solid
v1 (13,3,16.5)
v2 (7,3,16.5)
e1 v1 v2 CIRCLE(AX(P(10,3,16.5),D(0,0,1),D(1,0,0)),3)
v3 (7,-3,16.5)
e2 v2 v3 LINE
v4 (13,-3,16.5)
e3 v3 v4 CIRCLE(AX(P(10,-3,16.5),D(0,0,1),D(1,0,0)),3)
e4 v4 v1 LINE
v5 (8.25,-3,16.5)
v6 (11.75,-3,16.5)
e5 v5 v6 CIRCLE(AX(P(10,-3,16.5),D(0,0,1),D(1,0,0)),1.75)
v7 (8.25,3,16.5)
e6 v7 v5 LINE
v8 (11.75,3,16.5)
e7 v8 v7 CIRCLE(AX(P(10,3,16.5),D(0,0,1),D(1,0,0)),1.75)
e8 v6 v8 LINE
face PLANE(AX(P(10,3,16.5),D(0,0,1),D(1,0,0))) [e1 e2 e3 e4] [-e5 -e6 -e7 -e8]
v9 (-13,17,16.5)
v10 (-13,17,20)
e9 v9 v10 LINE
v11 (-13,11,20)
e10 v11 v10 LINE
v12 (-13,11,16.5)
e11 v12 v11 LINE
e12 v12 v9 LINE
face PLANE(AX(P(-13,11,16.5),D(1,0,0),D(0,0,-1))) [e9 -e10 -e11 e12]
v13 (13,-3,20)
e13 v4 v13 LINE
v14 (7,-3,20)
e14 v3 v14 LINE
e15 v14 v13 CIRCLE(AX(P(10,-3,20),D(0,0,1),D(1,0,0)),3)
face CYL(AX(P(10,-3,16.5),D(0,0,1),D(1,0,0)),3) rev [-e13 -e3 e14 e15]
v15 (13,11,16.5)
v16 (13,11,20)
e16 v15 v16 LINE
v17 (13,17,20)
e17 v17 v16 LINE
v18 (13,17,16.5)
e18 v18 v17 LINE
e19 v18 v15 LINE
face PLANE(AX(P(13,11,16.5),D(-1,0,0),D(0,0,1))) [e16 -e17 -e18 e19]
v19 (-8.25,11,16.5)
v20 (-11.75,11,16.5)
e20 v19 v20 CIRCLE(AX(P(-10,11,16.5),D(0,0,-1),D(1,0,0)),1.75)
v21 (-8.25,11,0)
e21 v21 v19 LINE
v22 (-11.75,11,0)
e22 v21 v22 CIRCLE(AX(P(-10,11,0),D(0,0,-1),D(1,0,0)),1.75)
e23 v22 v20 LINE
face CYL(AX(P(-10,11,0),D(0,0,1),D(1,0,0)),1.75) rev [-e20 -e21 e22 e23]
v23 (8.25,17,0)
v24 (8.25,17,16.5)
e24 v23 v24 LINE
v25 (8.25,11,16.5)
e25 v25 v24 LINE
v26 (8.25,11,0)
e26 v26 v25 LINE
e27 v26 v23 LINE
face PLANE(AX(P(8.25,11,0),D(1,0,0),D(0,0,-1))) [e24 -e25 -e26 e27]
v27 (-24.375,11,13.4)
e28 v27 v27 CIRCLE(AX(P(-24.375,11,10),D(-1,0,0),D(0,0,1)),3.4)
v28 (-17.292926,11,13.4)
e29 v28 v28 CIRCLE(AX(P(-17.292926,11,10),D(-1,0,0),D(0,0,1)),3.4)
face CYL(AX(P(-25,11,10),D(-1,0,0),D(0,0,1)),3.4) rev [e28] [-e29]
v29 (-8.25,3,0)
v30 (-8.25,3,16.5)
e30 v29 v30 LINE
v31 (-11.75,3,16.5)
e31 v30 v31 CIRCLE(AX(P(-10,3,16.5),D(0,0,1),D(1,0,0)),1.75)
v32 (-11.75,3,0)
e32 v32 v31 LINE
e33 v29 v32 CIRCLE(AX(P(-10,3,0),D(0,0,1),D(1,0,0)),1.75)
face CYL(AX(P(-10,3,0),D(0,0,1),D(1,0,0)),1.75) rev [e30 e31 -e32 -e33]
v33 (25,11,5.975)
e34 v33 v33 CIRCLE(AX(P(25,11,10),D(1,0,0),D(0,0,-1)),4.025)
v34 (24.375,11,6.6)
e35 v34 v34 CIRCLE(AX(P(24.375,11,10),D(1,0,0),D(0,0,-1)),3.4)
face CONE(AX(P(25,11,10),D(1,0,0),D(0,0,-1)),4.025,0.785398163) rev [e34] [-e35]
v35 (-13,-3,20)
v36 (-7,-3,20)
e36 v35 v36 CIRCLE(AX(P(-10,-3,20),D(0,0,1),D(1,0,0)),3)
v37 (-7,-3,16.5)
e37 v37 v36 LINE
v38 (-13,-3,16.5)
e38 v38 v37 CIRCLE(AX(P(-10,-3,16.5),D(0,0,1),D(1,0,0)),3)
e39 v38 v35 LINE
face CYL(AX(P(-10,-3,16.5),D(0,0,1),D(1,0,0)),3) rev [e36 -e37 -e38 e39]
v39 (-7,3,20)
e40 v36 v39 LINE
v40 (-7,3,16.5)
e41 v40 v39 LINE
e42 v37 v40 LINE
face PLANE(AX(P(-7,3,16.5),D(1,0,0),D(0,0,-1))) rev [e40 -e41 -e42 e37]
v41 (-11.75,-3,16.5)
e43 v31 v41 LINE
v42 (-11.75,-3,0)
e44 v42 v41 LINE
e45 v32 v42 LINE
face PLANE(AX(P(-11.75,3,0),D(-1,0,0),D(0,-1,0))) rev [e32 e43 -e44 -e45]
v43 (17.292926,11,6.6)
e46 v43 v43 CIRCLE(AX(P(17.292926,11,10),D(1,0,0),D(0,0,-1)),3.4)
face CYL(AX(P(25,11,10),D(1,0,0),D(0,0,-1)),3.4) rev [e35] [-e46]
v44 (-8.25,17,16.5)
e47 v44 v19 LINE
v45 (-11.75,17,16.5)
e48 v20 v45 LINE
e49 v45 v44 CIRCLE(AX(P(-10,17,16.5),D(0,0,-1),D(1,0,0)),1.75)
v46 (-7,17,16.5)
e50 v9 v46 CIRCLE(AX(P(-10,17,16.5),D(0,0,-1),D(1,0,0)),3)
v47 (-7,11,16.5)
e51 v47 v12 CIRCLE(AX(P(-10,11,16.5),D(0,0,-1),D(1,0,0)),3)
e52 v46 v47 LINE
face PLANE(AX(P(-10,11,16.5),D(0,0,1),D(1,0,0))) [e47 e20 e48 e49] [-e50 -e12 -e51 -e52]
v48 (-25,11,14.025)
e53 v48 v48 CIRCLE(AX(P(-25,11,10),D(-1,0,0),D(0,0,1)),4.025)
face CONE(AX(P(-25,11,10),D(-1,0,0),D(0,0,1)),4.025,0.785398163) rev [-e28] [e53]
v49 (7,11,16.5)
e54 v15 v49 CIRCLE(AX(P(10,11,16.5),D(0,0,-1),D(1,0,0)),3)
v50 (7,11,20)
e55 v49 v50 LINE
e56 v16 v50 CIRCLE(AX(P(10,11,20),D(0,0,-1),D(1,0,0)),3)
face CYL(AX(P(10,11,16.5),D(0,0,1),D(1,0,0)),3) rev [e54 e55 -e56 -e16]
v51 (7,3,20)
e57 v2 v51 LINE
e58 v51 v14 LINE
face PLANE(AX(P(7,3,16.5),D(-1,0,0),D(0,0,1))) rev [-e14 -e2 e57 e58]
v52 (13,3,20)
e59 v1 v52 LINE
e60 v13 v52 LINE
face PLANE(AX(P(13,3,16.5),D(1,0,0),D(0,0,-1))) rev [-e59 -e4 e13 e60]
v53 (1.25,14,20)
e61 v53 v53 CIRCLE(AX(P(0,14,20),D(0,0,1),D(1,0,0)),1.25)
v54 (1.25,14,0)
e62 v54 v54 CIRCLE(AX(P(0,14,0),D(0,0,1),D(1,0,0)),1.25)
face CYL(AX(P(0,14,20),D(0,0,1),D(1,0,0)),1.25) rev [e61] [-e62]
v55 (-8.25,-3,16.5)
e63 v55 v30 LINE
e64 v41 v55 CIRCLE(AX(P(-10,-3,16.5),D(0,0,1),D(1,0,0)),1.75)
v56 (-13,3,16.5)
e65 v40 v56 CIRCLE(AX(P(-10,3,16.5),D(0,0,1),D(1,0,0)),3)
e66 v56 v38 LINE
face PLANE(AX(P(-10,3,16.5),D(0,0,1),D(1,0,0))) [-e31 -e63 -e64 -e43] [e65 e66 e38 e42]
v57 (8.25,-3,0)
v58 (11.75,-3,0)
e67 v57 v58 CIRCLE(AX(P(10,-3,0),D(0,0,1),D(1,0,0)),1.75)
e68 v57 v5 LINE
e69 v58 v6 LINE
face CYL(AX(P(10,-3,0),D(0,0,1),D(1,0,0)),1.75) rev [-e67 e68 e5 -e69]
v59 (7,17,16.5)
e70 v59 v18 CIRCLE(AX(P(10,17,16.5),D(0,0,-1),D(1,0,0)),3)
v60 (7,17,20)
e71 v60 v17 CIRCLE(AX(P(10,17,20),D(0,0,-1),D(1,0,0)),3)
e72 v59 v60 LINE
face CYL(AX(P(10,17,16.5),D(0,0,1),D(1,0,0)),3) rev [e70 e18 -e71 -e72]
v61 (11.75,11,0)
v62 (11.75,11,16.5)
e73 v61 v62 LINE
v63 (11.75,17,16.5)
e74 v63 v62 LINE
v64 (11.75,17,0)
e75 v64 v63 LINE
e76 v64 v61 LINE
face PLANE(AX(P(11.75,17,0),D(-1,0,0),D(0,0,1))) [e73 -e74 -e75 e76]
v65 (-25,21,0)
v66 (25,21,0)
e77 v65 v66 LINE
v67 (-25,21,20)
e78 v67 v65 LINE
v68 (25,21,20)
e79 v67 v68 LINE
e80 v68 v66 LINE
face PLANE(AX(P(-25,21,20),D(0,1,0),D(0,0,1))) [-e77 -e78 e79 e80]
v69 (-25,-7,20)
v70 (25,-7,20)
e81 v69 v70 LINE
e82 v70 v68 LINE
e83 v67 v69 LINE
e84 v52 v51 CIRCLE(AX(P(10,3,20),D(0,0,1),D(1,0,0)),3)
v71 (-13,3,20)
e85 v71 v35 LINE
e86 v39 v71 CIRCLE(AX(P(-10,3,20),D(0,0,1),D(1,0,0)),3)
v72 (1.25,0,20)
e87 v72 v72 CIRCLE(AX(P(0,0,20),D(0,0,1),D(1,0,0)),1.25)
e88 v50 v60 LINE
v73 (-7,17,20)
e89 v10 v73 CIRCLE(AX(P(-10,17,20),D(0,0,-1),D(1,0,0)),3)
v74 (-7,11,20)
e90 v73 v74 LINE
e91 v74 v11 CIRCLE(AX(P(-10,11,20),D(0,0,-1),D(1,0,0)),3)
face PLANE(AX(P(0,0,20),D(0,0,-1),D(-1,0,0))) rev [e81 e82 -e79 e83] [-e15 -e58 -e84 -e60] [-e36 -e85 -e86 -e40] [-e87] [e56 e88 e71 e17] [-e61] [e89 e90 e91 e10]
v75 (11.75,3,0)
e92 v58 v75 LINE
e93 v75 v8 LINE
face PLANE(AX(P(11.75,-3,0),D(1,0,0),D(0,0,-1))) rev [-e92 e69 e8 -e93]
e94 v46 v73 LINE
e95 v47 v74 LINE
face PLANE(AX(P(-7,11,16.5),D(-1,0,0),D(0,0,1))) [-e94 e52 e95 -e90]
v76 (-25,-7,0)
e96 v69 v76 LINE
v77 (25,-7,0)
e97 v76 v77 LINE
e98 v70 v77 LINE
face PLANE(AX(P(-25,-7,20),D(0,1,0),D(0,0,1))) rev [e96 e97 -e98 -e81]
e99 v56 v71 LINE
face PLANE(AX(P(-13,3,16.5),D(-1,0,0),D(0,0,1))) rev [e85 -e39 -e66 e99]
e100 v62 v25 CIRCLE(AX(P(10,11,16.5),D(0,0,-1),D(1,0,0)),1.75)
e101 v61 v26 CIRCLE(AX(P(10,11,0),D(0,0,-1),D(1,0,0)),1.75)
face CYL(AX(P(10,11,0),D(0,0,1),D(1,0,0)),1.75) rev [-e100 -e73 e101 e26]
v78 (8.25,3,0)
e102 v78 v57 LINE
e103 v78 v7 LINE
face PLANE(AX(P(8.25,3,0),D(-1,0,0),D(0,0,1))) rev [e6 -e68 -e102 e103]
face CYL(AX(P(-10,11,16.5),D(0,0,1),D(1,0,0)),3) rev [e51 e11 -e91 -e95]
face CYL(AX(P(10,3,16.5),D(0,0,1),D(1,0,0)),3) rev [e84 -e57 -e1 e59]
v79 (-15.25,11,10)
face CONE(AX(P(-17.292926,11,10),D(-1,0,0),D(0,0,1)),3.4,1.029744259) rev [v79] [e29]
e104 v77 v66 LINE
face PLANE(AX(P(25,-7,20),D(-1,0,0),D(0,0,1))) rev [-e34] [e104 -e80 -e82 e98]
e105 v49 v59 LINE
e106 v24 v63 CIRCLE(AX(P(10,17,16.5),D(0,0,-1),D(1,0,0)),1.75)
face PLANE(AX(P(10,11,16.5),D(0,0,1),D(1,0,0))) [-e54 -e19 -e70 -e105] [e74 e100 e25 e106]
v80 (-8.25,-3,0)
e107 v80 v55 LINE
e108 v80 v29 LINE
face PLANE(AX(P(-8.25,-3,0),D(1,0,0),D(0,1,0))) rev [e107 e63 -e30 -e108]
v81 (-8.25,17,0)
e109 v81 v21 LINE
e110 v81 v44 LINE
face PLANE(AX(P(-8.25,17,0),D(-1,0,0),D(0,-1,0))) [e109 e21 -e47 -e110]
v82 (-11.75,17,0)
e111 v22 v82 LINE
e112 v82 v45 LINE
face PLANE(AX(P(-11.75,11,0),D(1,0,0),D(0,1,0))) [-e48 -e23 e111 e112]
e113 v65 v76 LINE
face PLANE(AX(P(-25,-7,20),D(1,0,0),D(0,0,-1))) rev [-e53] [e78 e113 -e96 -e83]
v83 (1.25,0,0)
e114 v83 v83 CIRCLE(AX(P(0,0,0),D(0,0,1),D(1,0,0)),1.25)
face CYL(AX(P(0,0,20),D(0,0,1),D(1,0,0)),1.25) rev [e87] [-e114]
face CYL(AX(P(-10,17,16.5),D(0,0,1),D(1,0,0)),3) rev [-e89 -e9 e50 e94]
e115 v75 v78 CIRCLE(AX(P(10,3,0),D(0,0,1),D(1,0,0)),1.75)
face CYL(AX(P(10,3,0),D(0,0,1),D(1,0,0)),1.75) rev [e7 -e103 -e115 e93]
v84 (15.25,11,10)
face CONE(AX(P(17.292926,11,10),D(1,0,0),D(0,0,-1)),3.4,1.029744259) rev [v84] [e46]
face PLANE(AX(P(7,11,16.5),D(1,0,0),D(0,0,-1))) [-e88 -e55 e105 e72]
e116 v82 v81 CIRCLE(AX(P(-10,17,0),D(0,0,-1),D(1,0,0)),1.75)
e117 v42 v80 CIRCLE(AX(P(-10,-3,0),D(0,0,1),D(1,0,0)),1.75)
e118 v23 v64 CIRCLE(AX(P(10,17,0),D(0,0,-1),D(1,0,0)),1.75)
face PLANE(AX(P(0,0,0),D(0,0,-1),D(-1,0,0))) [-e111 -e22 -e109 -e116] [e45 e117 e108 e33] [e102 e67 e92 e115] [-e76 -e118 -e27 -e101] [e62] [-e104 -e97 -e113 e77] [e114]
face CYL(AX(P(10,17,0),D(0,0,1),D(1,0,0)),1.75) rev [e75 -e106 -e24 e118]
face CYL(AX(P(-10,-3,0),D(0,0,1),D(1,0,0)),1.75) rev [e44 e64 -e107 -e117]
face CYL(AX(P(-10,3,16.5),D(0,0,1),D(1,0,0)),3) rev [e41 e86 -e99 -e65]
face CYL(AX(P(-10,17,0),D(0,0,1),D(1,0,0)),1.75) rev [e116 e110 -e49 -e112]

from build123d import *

# Parameters (mm, degrees)
SKETCH1_W             = 50
SKETCH1_H             = 14
BOSS_EXTRUDE1_DEPTH   = 20
CUT_EXTRUDE1_DEPTH    = 3.5
CUT_EXTRUDE2_DEPTH    = 31.761176831
M3X0_5_TAPPED_HOLE1_D = 2.5
MIRROR1_OUTLINE_W     = 50
MIRROR1_OUTLINE_H     = 14
MIRROR1_OUTLINE_R     = 1.25
MIRROR1_DEPTH         = 20
MIRROR1_2_DEPTH       = 16.5


# Read off the part's stored shape, not the designer's step: Mirror1
with BuildPart() as part:
    # Sketch1 → Boss-Extrude1 (new body)
    with BuildSketch(Plane.XY):
        Rectangle(SKETCH1_W, SKETCH1_H)
    extrude(amount=BOSS_EXTRUDE1_DEPTH)

    # Sketch2 → Cut-Extrude1 (cut)
    with BuildSketch(Plane.XY.offset(20)):
        with BuildLine():
            Line((-7, 3), (-7, -3))
            ThreePointArc((-7, -3), (-10, -6), (-13, -3))
            Line((-13, -3), (-13, 3))
            ThreePointArc((-13, 3), (-10, 6), (-7, 3))
        make_face()
        with BuildLine():
            Line((13, 3), (13, -3))
            ThreePointArc((13, -3), (10, -6), (7, -3))
            Line((7, -3), (7, 3))
            ThreePointArc((7, 3), (10, 6), (13, 3))
        make_face()
    extrude(amount=-CUT_EXTRUDE1_DEPTH, mode=Mode.SUBTRACT)

    # Sketch3 → Cut-Extrude2 (cut, through all)
    with BuildSketch(Plane.XY.offset(16.5)):
        with BuildLine():
            Line((-11.75, 3), (-11.75, -3))
            ThreePointArc((-11.75, -3), (-10, -4.75), (-8.25, -3))
            Line((-8.25, -3), (-8.25, 3))
            ThreePointArc((-8.25, 3), (-10, 4.75), (-11.75, 3))
        make_face()
        with BuildLine():
            Line((11.75, -3), (11.75, 3))
            ThreePointArc((11.75, 3), (10, 4.75), (8.25, 3))
            Line((8.25, 3), (8.25, -3))
            ThreePointArc((8.25, -3), (10, -4.75), (11.75, -3))
        make_face()
    extrude(amount=-CUT_EXTRUDE2_DEPTH, mode=Mode.SUBTRACT)

    # M3x0.5 Tapped Hole1 (through all)
    with Locations(Plane.XY.offset(20)):
        with Locations((0, 0)):
            Hole(M3X0_5_TAPPED_HOLE1_D / 2)

    # Mirror1 outline → Mirror1 (add)
    with BuildSketch(Plane.XY):
        with Locations((0, 14)):
            Rectangle(MIRROR1_OUTLINE_W, MIRROR1_OUTLINE_H)
        with BuildLine():
            ThreePointArc((-13, 17), (-10, 20), (-7, 17))
            Line((-7, 17), (-7, 11))
            ThreePointArc((-7, 11), (-10, 8), (-13, 11))
            Line((-13, 11), (-13, 17))
        make_face(mode=Mode.SUBTRACT)
        with Locations((0, 14)):
            Circle(MIRROR1_OUTLINE_R, mode=Mode.SUBTRACT)
        with BuildLine():
            ThreePointArc((7, 17), (10, 20), (13, 17))
            Line((13, 17), (13, 11))
            ThreePointArc((13, 11), (10, 8), (7, 11))
            Line((7, 11), (7, 17))
        make_face(mode=Mode.SUBTRACT)
    extrude(amount=MIRROR1_DEPTH)

    # Mirror1 2 outline → Mirror1 2 (add)
    # profile 1 of 2: a face of its own
    with BuildSketch(Plane.XY):
        with BuildLine():
            Line((13, 11), (13, 17))
            ThreePointArc((13, 17), (10, 20), (7, 17))
            Line((7, 17), (7, 11))
            ThreePointArc((7, 11), (10, 8), (13, 11))
        make_face()
        with BuildLine():
            ThreePointArc((11.75, 11), (10, 9.25), (8.25, 11))
            Line((8.25, 11), (8.25, 17))
            ThreePointArc((8.25, 17), (10, 18.75), (11.75, 17))
            Line((11.75, 17), (11.75, 11))
        make_face(mode=Mode.SUBTRACT)
    # profile 2 of 2: a face of its own
    with BuildSketch(Plane.XY):
        with BuildLine():
            Line((-7, 11), (-7, 17))
            ThreePointArc((-7, 17), (-10, 20), (-13, 17))
            Line((-13, 17), (-13, 11))
            ThreePointArc((-13, 11), (-10, 8), (-7, 11))
        make_face()
        with BuildLine():
            ThreePointArc((-11.75, 17), (-10, 18.75), (-8.25, 17))
            Line((-8.25, 17), (-8.25, 11))
            ThreePointArc((-8.25, 11), (-10, 9.25), (-11.75, 11))
            Line((-11.75, 11), (-11.75, 17))
        make_face(mode=Mode.SUBTRACT)
    extrude(amount=MIRROR1_2_DEPTH)

    # Sketch10 → M8x1.25 Tapped Hole1 (revolve, cut)
    with BuildSketch(Plane(origin=(25, 11, 10), x_dir=(0, 0, -1), z_dir=(0, 1, 0))):
        Polygon((0, 0), (0, 9.75), (3.4, 7.707073895), (3.4, 0.625), (4.025, 0), align=None)
    m8x1_25_tapped_hole1 = revolve(axis=Axis((31.35, 11, 10), (-1, 0, 0)), mode=Mode.SUBTRACT)

    # Mirror2: M8x1.25 Tapped Hole1 across plane
    add(m8x1_25_tapped_hole1.mirror(Plane(origin=(0, 0, 0), x_dir=(0, 0, 1), z_dir=(1, 0, 0))), mode=Mode.SUBTRACT)


solid = part.part
